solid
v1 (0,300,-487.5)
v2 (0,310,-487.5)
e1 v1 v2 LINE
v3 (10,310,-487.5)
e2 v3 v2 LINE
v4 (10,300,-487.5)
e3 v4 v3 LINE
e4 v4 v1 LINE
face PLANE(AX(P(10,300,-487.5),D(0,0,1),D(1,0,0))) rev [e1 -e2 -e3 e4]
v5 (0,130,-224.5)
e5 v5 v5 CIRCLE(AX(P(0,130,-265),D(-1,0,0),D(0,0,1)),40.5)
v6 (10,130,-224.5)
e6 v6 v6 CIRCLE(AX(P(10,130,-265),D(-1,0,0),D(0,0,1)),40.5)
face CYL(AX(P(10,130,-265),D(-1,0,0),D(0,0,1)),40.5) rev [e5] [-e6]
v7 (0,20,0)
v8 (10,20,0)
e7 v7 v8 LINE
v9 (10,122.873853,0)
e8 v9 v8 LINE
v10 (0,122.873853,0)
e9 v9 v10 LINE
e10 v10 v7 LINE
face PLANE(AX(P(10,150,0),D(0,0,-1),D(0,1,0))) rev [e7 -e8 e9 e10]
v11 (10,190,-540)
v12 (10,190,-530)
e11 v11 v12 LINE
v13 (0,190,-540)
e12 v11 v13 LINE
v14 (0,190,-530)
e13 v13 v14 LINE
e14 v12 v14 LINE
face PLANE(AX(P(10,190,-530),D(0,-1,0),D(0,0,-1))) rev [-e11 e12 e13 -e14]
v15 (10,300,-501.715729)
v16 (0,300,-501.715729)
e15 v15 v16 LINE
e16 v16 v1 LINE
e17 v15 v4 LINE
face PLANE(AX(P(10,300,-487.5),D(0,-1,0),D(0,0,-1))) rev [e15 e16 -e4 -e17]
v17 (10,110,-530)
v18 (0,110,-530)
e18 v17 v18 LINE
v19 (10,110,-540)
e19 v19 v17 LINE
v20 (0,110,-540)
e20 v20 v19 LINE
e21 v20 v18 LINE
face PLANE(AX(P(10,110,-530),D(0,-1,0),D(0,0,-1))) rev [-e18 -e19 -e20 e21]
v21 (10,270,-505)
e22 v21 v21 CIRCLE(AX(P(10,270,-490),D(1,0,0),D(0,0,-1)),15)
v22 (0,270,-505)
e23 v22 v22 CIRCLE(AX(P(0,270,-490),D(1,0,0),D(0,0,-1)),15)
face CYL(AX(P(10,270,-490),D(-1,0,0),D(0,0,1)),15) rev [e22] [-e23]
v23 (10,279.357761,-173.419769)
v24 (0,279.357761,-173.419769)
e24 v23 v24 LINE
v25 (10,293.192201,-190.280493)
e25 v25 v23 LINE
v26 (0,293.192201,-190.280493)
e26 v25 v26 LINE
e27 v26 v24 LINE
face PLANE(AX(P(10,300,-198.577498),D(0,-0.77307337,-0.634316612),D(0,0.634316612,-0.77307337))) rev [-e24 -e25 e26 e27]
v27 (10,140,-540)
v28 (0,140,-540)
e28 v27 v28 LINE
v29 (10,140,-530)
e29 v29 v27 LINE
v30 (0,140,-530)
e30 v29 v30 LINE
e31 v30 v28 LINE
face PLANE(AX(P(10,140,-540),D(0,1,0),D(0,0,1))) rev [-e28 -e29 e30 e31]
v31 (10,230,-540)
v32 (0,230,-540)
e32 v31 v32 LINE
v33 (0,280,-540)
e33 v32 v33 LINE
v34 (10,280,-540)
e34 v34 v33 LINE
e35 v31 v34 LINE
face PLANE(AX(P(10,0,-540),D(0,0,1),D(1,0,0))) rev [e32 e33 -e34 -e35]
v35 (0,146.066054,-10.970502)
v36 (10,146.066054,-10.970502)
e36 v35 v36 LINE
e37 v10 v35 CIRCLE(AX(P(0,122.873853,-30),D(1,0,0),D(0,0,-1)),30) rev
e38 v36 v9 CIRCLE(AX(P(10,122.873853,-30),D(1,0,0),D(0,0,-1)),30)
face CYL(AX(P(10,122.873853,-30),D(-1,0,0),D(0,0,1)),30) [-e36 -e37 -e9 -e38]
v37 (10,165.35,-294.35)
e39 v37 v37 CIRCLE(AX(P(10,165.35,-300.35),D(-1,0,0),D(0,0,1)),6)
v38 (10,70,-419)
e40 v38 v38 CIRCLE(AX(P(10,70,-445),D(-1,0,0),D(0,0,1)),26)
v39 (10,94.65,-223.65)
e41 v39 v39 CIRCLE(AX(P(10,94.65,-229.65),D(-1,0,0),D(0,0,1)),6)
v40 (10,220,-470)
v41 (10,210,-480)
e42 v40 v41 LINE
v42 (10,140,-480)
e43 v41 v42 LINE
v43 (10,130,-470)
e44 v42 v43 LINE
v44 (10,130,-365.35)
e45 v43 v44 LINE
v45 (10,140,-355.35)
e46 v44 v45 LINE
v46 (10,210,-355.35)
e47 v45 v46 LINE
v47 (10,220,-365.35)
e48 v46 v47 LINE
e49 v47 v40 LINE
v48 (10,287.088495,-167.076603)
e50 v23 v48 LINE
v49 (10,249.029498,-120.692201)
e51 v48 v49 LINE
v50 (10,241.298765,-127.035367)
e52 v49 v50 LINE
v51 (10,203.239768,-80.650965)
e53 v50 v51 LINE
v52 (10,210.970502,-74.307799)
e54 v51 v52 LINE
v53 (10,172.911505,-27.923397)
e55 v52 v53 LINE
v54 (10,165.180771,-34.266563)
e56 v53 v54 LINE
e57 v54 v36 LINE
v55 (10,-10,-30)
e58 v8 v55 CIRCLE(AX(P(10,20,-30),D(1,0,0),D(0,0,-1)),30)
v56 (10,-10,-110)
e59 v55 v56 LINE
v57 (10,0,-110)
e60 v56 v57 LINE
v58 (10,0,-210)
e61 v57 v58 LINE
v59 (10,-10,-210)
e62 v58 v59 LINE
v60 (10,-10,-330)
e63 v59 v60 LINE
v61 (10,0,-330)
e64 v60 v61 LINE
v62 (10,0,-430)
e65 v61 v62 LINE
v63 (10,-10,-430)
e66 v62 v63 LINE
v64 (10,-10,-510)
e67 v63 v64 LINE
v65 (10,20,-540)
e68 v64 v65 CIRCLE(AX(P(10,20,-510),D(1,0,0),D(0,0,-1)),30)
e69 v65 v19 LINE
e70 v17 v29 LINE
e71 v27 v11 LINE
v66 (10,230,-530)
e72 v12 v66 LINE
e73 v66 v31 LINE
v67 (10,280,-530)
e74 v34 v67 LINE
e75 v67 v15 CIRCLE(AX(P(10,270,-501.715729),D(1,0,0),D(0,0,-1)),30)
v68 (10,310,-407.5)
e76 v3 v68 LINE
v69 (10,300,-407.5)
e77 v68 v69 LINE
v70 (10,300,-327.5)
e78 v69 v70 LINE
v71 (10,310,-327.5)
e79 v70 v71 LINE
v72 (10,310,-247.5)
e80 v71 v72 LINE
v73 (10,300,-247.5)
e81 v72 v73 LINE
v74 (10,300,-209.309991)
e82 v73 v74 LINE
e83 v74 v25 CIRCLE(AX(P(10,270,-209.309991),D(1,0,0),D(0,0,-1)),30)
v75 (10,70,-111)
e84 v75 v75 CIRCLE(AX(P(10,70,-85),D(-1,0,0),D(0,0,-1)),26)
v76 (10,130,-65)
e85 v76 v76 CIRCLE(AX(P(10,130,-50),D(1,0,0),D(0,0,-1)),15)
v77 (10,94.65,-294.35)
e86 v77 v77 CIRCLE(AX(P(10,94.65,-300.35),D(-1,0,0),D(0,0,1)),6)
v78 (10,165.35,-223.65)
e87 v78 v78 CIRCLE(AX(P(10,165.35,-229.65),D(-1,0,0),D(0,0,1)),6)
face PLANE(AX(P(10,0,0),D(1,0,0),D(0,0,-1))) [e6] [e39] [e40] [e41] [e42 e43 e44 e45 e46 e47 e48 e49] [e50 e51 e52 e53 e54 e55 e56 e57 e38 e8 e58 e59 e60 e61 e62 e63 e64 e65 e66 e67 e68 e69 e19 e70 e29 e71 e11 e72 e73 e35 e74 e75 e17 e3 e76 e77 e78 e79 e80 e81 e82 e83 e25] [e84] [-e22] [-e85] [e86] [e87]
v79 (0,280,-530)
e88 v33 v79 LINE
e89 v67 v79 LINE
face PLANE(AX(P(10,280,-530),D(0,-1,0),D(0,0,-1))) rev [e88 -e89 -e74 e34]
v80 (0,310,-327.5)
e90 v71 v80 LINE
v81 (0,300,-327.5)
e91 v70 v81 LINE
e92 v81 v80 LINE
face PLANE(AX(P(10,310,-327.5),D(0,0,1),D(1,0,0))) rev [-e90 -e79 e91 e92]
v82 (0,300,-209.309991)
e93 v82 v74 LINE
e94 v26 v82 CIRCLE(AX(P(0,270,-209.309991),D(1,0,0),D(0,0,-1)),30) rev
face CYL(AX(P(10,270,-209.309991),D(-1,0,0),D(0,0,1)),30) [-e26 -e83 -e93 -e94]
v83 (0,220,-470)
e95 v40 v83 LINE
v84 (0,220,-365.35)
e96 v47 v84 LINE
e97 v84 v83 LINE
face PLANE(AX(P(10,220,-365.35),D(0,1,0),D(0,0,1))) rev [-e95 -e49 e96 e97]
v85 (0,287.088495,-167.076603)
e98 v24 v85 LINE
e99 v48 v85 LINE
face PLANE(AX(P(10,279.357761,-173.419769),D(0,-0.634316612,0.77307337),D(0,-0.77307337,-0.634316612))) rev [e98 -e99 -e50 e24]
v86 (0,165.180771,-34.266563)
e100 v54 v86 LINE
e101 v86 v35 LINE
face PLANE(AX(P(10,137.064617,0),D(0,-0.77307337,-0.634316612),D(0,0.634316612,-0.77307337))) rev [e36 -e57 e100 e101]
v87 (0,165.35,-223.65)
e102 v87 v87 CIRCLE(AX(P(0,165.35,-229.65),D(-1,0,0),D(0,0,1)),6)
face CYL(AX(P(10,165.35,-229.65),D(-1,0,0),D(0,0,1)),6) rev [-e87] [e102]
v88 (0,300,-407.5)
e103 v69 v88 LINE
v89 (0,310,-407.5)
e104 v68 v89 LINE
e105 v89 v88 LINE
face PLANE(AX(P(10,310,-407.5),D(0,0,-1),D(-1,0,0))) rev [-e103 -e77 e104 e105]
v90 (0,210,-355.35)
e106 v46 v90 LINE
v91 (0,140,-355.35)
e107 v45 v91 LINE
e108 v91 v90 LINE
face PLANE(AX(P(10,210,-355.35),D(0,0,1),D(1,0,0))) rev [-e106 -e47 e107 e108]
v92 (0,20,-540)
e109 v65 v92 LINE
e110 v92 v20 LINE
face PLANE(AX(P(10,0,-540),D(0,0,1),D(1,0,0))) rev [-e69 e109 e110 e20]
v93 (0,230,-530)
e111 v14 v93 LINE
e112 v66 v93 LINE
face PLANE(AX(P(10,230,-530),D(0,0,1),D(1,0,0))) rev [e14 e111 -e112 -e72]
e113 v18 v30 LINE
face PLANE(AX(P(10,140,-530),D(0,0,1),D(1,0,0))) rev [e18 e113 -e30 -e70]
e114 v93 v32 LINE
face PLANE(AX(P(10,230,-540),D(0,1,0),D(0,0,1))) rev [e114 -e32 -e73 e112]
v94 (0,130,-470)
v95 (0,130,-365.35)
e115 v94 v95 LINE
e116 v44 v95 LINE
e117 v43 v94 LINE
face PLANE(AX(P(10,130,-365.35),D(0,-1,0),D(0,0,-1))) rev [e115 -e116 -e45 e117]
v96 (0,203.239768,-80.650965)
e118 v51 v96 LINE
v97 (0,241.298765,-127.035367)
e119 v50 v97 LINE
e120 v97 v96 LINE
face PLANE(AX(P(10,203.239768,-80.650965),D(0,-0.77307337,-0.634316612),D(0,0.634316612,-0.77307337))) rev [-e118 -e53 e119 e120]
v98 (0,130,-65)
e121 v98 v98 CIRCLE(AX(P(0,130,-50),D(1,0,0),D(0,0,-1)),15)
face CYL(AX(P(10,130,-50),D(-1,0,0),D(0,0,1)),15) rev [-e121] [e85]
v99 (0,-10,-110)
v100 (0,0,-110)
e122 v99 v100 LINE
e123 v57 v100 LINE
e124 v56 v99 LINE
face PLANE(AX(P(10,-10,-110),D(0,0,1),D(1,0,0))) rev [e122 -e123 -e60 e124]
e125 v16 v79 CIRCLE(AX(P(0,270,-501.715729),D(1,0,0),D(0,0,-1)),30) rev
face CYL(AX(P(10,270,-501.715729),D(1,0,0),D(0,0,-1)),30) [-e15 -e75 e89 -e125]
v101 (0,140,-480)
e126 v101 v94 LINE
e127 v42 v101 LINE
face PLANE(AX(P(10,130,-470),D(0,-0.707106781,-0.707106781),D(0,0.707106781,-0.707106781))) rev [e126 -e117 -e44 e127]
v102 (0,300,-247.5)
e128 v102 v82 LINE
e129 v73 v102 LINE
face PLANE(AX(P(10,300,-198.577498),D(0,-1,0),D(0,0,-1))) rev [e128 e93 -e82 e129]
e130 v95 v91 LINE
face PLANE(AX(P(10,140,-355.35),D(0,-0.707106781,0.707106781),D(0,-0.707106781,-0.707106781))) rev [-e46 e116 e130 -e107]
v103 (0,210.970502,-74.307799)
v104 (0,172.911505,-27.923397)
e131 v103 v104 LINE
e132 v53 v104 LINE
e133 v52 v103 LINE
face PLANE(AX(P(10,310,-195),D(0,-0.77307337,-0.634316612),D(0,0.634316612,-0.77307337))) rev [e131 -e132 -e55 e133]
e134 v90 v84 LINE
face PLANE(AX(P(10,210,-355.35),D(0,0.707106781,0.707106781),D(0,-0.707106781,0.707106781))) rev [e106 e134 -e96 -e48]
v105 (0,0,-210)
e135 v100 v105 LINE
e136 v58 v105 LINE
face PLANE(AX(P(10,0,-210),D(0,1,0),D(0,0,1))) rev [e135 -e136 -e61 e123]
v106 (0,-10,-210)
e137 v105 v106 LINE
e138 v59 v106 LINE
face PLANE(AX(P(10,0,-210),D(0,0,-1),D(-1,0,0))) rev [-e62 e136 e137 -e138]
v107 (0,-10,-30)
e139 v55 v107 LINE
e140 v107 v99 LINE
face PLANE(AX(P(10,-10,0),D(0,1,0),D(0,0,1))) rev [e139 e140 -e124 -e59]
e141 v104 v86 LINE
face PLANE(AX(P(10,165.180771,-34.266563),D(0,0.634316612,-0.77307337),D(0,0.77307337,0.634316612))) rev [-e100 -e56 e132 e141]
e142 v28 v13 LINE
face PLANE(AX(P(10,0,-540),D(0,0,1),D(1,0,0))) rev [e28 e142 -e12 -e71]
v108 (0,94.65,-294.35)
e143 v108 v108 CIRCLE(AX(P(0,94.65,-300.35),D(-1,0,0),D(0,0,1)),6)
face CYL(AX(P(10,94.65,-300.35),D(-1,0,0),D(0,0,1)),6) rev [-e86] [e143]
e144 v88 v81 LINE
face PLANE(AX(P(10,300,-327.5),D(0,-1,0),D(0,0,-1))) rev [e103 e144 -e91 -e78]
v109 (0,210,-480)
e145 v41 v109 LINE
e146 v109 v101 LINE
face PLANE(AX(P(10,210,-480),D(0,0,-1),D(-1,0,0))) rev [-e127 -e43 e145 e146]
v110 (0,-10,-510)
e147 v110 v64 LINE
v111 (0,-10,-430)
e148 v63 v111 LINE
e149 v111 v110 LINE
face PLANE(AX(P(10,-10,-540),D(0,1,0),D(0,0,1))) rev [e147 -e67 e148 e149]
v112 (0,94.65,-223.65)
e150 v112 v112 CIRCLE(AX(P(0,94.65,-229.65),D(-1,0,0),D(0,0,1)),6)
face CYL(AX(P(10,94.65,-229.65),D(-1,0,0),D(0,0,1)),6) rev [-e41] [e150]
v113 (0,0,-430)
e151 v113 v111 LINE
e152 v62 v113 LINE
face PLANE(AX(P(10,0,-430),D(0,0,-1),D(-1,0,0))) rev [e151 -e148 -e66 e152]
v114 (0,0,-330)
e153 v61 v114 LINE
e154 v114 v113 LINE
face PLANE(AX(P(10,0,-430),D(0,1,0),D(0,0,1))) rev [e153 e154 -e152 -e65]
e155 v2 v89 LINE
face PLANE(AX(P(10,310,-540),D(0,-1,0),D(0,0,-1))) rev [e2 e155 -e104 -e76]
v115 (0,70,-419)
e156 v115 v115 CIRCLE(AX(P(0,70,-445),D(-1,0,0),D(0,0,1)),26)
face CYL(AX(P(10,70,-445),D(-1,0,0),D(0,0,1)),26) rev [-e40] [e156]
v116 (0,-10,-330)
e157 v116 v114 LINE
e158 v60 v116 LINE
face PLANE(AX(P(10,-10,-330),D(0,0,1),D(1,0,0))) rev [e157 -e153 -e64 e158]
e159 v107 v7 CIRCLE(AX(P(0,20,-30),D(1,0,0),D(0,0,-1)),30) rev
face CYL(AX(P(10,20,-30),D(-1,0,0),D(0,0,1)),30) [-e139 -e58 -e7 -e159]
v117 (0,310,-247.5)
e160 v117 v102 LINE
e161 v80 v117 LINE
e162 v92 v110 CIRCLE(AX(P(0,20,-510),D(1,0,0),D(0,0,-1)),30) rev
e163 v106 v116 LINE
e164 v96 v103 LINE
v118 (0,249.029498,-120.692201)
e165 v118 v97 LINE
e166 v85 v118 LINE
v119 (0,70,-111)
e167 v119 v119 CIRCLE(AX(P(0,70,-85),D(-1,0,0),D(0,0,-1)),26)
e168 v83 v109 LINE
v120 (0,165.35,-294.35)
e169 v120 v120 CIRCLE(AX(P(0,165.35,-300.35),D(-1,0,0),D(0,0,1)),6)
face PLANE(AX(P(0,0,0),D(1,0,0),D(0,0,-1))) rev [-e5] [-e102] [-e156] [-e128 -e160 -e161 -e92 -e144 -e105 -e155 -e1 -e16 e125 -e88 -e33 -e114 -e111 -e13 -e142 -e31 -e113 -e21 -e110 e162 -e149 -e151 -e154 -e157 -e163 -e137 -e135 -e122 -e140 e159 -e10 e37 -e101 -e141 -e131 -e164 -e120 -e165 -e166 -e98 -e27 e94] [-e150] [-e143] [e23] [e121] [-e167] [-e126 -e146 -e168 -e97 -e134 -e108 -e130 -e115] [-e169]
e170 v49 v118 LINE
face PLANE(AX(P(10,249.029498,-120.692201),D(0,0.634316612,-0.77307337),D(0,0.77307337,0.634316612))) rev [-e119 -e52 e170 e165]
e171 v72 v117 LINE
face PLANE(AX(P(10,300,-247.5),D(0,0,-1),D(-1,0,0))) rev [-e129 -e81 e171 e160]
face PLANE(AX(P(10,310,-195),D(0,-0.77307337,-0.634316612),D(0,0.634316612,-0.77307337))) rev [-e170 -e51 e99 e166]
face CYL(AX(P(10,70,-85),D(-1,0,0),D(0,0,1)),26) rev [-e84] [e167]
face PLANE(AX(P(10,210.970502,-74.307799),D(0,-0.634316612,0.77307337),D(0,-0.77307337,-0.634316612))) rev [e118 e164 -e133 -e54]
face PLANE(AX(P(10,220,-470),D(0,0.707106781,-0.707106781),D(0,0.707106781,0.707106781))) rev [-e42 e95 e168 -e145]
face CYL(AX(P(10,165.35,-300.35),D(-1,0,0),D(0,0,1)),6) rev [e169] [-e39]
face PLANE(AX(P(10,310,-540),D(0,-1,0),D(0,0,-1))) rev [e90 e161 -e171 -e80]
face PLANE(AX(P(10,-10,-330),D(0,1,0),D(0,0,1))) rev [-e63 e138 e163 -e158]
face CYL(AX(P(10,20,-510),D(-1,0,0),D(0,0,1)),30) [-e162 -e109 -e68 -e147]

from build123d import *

# Parameters (mm, degrees)
ESQUISSE1_R             = 15
BOSS_EXTRU_1_DEPTH      = 10
ESQUISSE5_R             = 40.5
ESQUISSE5_R_2           = 6
ENL_V_MAT_EXTRU_1_DEPTH = 10
ESQUISSE6_R             = 26
ENL_V_MAT_EXTRU_2_DEPTH = 10
ENL_V_MAT_EXTRU_3_DEPTH = 10
CONG_1_R                = 30
ENL_V_MAT_EXTRU_4_DEPTH = 10


with BuildPart() as part:
    # Esquisse1 → Boss.-Extru.1 (new body)
    with BuildSketch(Plane(origin=(0, 0, 0), x_dir=(0, 0, -1), z_dir=(1, 0, 0))):
        Polygon((540, 0), (540, 310), (195, 310), (0, 150), (0, 0), (0, -10), (110, -10), (110, 0), (210, 0), (210, -10), (330, -10), (330, 0), (430, 0), (430, -10), (540, -10), align=None)
        with Locations((490, 270)):
            Circle(ESQUISSE1_R, mode=Mode.SUBTRACT)
        with Locations((50, 130)):
            Circle(ESQUISSE1_R, mode=Mode.SUBTRACT)
    extrude(amount=BOSS_EXTRU_1_DEPTH)

    # Esquisse5 → Enlèv. mat.-Extru.1 (cut)
    with BuildSketch(Plane.ZY):
        with Locations((-265, 130)):
            Circle(ESQUISSE5_R)
        with Locations((-300.35, 94.65)):
            Circle(ESQUISSE5_R_2)
        with Locations((-300.35, 165.35)):
            Circle(ESQUISSE5_R_2)
        with Locations((-229.65, 165.35)):
            Circle(ESQUISSE5_R_2)
        with Locations((-229.65, 94.65)):
            Circle(ESQUISSE5_R_2)
    extrude(amount=-ENL_V_MAT_EXTRU_1_DEPTH, mode=Mode.SUBTRACT)

    # Esquisse6 → Enlèv. mat.-Extru.2 (cut)
    with BuildSketch(Plane.ZY):
        with Locations((-445, 70)):
            Circle(ESQUISSE6_R)
        with Locations(Location((-85, 70, 0), (0, 0, 180))):
            Circle(ESQUISSE6_R)
    extrude(amount=-ENL_V_MAT_EXTRU_2_DEPTH, mode=Mode.SUBTRACT)

    # Esquisse7 → Enlèv. mat.-Extru.3 (cut)
    with BuildSketch(Plane.ZY):
        Polygon((-198.57749782, 300), (-247.5, 300), (-247.5, 310), (-327.5, 310), (-327.5, 300), (-407.5, 300), (-407.5, 310), (-487.5, 310), (-487.5, 300), (-530, 300), (-530, 280), (-540, 280), (-540, 230), (-530, 230), (-530, 190), (-540, 190), (-540, 140), (-530, 140), (-530, 110), (-794.780536076, 110), (-794.780536076, 495.732813741), (95.631773419, 495.732813741), (95.631773419, 137.064617174), (0, 137.064617174), (-34.266562773, 165.180771244), (-27.923396657, 172.911504949), (-74.307798886, 210.97050165), (-80.650965002, 203.239767945), (-127.035367231, 241.298764646), (-120.692201114, 249.02949835), (-167.076603343, 287.088495051), (-173.41976946, 279.357761346), align=None)
    extrude(amount=-ENL_V_MAT_EXTRU_3_DEPTH, mode=Mode.SUBTRACT)

    # Congé1
    # the kernel refuses this fillet: 30 mm, written as the material it takes off along each edge
    with BuildSketch(Plane(origin=(-75, -10, -540), x_dir=(0, 1, 0), z_dir=(1, 0, 0)), Plane(origin=(-75, -10, 0), x_dir=(0, 0, -1), z_dir=(1, 0, 0))) as cong_1_piece_1:
        with BuildLine():
            CenterArc((CONG_1_R, CONG_1_R), CONG_1_R, 180, 90)
            Line((0, CONG_1_R), (-CONG_1_R * 0.02, CONG_1_R))
            Line((-CONG_1_R * 0.02, CONG_1_R), (-CONG_1_R * 0.02, -CONG_1_R * 0.02))
            Line((-CONG_1_R * 0.02, -CONG_1_R * 0.02), (CONG_1_R, -CONG_1_R * 0.02))
            Line((CONG_1_R, -CONG_1_R * 0.02), (CONG_1_R, 0))
        make_face()
    extrude(amount=160, mode=Mode.SUBTRACT)
    with BuildSketch(Plane(origin=(-70.710678119, 300, -530), x_dir=(0, -1, 0), z_dir=(1, 0, 0))) as cong_1_piece_2:
        with BuildLine():
            CenterArc((30, -28.284271247), CONG_1_R, 109.471220634, 70.528779366)
            Line((0, -28.284271247), (-0.6, -28.284271247))
            Line((-0.6, -28.284271247), (-0.6, 0))
            Line((-0.6, 0), (0, 0.6))
            ThreePointArc((0, 0.6), (10, 0.6), (19.8, 0.565685425))
            Line((19.8, 0.565685425), (20, 0))
        make_face()
    extrude(amount=151.421356237, mode=Mode.SUBTRACT)
    with BuildSketch(Plane(origin=(-35.476909659, 137.064617174, 0), x_dir=(0, -1, 0), z_dir=(1, 0, 0))) as cong_1_piece_3:
        with BuildLine():
            CenterArc((CONG_1_R * 0.473025462116, CONG_1_R), CONG_1_R, 219.369317242, 50.630682758)
            Line((-CONG_1_R * 0.300047908367, CONG_1_R * 0.365683388322), (-CONG_1_R * 0.315509375776, CONG_1_R * 0.352997056088))
            Line((-CONG_1_R * 0.315509375776, CONG_1_R * 0.352997056088), (-CONG_1_R * 0.00946050924232, -CONG_1_R * 0.02))
            Line((-CONG_1_R * 0.00946050924232, -CONG_1_R * 0.02), (CONG_1_R * 0.473025462116, -CONG_1_R * 0.02))
            Line((CONG_1_R * 0.473025462116, -CONG_1_R * 0.02), (CONG_1_R * 0.473025462116, 0))
        make_face()
    extrude(amount=80.953819317, mode=Mode.SUBTRACT)
    with BuildSketch(Plane(origin=(-26.831233647, 300, -198.57749782), x_dir=(0, -0.634316611678022, 0.7730733704825911), z_dir=(1, 0, 0))) as cong_1_piece_4:
        with BuildLine():
            CenterArc((CONG_1_R * 0.357749781954, CONG_1_R), CONG_1_R, 230.630682758, 39.369317242)
            Line((-CONG_1_R * 0.276566829724, CONG_1_R * 0.226926629517), (-CONG_1_R * 0.289253161958, CONG_1_R * 0.211465162108))
            Line((-CONG_1_R * 0.289253161958, CONG_1_R * 0.211465162108), (-CONG_1_R * 0.00715499563907, -CONG_1_R * 0.02))
            Line((-CONG_1_R * 0.00715499563907, -CONG_1_R * 0.02), (CONG_1_R * 0.357749781954, -CONG_1_R * 0.02))
            Line((CONG_1_R * 0.357749781954, -CONG_1_R * 0.02), (CONG_1_R * 0.357749781954, 0))
        make_face()
    extrude(amount=63.662467293, mode=Mode.SUBTRACT)

    # Esquisse8 → Enlèv. mat.-Extru.4 (cut)
    with BuildSketch(Plane.ZY):
        Polygon((-355.35, 210), (-365.35, 220), (-470, 220), (-480, 210), (-480, 140), (-470, 130), (-365.35, 130), (-355.35, 140), align=None)
    extrude(amount=-ENL_V_MAT_EXTRU_4_DEPTH, mode=Mode.SUBTRACT)


solid = part.part
